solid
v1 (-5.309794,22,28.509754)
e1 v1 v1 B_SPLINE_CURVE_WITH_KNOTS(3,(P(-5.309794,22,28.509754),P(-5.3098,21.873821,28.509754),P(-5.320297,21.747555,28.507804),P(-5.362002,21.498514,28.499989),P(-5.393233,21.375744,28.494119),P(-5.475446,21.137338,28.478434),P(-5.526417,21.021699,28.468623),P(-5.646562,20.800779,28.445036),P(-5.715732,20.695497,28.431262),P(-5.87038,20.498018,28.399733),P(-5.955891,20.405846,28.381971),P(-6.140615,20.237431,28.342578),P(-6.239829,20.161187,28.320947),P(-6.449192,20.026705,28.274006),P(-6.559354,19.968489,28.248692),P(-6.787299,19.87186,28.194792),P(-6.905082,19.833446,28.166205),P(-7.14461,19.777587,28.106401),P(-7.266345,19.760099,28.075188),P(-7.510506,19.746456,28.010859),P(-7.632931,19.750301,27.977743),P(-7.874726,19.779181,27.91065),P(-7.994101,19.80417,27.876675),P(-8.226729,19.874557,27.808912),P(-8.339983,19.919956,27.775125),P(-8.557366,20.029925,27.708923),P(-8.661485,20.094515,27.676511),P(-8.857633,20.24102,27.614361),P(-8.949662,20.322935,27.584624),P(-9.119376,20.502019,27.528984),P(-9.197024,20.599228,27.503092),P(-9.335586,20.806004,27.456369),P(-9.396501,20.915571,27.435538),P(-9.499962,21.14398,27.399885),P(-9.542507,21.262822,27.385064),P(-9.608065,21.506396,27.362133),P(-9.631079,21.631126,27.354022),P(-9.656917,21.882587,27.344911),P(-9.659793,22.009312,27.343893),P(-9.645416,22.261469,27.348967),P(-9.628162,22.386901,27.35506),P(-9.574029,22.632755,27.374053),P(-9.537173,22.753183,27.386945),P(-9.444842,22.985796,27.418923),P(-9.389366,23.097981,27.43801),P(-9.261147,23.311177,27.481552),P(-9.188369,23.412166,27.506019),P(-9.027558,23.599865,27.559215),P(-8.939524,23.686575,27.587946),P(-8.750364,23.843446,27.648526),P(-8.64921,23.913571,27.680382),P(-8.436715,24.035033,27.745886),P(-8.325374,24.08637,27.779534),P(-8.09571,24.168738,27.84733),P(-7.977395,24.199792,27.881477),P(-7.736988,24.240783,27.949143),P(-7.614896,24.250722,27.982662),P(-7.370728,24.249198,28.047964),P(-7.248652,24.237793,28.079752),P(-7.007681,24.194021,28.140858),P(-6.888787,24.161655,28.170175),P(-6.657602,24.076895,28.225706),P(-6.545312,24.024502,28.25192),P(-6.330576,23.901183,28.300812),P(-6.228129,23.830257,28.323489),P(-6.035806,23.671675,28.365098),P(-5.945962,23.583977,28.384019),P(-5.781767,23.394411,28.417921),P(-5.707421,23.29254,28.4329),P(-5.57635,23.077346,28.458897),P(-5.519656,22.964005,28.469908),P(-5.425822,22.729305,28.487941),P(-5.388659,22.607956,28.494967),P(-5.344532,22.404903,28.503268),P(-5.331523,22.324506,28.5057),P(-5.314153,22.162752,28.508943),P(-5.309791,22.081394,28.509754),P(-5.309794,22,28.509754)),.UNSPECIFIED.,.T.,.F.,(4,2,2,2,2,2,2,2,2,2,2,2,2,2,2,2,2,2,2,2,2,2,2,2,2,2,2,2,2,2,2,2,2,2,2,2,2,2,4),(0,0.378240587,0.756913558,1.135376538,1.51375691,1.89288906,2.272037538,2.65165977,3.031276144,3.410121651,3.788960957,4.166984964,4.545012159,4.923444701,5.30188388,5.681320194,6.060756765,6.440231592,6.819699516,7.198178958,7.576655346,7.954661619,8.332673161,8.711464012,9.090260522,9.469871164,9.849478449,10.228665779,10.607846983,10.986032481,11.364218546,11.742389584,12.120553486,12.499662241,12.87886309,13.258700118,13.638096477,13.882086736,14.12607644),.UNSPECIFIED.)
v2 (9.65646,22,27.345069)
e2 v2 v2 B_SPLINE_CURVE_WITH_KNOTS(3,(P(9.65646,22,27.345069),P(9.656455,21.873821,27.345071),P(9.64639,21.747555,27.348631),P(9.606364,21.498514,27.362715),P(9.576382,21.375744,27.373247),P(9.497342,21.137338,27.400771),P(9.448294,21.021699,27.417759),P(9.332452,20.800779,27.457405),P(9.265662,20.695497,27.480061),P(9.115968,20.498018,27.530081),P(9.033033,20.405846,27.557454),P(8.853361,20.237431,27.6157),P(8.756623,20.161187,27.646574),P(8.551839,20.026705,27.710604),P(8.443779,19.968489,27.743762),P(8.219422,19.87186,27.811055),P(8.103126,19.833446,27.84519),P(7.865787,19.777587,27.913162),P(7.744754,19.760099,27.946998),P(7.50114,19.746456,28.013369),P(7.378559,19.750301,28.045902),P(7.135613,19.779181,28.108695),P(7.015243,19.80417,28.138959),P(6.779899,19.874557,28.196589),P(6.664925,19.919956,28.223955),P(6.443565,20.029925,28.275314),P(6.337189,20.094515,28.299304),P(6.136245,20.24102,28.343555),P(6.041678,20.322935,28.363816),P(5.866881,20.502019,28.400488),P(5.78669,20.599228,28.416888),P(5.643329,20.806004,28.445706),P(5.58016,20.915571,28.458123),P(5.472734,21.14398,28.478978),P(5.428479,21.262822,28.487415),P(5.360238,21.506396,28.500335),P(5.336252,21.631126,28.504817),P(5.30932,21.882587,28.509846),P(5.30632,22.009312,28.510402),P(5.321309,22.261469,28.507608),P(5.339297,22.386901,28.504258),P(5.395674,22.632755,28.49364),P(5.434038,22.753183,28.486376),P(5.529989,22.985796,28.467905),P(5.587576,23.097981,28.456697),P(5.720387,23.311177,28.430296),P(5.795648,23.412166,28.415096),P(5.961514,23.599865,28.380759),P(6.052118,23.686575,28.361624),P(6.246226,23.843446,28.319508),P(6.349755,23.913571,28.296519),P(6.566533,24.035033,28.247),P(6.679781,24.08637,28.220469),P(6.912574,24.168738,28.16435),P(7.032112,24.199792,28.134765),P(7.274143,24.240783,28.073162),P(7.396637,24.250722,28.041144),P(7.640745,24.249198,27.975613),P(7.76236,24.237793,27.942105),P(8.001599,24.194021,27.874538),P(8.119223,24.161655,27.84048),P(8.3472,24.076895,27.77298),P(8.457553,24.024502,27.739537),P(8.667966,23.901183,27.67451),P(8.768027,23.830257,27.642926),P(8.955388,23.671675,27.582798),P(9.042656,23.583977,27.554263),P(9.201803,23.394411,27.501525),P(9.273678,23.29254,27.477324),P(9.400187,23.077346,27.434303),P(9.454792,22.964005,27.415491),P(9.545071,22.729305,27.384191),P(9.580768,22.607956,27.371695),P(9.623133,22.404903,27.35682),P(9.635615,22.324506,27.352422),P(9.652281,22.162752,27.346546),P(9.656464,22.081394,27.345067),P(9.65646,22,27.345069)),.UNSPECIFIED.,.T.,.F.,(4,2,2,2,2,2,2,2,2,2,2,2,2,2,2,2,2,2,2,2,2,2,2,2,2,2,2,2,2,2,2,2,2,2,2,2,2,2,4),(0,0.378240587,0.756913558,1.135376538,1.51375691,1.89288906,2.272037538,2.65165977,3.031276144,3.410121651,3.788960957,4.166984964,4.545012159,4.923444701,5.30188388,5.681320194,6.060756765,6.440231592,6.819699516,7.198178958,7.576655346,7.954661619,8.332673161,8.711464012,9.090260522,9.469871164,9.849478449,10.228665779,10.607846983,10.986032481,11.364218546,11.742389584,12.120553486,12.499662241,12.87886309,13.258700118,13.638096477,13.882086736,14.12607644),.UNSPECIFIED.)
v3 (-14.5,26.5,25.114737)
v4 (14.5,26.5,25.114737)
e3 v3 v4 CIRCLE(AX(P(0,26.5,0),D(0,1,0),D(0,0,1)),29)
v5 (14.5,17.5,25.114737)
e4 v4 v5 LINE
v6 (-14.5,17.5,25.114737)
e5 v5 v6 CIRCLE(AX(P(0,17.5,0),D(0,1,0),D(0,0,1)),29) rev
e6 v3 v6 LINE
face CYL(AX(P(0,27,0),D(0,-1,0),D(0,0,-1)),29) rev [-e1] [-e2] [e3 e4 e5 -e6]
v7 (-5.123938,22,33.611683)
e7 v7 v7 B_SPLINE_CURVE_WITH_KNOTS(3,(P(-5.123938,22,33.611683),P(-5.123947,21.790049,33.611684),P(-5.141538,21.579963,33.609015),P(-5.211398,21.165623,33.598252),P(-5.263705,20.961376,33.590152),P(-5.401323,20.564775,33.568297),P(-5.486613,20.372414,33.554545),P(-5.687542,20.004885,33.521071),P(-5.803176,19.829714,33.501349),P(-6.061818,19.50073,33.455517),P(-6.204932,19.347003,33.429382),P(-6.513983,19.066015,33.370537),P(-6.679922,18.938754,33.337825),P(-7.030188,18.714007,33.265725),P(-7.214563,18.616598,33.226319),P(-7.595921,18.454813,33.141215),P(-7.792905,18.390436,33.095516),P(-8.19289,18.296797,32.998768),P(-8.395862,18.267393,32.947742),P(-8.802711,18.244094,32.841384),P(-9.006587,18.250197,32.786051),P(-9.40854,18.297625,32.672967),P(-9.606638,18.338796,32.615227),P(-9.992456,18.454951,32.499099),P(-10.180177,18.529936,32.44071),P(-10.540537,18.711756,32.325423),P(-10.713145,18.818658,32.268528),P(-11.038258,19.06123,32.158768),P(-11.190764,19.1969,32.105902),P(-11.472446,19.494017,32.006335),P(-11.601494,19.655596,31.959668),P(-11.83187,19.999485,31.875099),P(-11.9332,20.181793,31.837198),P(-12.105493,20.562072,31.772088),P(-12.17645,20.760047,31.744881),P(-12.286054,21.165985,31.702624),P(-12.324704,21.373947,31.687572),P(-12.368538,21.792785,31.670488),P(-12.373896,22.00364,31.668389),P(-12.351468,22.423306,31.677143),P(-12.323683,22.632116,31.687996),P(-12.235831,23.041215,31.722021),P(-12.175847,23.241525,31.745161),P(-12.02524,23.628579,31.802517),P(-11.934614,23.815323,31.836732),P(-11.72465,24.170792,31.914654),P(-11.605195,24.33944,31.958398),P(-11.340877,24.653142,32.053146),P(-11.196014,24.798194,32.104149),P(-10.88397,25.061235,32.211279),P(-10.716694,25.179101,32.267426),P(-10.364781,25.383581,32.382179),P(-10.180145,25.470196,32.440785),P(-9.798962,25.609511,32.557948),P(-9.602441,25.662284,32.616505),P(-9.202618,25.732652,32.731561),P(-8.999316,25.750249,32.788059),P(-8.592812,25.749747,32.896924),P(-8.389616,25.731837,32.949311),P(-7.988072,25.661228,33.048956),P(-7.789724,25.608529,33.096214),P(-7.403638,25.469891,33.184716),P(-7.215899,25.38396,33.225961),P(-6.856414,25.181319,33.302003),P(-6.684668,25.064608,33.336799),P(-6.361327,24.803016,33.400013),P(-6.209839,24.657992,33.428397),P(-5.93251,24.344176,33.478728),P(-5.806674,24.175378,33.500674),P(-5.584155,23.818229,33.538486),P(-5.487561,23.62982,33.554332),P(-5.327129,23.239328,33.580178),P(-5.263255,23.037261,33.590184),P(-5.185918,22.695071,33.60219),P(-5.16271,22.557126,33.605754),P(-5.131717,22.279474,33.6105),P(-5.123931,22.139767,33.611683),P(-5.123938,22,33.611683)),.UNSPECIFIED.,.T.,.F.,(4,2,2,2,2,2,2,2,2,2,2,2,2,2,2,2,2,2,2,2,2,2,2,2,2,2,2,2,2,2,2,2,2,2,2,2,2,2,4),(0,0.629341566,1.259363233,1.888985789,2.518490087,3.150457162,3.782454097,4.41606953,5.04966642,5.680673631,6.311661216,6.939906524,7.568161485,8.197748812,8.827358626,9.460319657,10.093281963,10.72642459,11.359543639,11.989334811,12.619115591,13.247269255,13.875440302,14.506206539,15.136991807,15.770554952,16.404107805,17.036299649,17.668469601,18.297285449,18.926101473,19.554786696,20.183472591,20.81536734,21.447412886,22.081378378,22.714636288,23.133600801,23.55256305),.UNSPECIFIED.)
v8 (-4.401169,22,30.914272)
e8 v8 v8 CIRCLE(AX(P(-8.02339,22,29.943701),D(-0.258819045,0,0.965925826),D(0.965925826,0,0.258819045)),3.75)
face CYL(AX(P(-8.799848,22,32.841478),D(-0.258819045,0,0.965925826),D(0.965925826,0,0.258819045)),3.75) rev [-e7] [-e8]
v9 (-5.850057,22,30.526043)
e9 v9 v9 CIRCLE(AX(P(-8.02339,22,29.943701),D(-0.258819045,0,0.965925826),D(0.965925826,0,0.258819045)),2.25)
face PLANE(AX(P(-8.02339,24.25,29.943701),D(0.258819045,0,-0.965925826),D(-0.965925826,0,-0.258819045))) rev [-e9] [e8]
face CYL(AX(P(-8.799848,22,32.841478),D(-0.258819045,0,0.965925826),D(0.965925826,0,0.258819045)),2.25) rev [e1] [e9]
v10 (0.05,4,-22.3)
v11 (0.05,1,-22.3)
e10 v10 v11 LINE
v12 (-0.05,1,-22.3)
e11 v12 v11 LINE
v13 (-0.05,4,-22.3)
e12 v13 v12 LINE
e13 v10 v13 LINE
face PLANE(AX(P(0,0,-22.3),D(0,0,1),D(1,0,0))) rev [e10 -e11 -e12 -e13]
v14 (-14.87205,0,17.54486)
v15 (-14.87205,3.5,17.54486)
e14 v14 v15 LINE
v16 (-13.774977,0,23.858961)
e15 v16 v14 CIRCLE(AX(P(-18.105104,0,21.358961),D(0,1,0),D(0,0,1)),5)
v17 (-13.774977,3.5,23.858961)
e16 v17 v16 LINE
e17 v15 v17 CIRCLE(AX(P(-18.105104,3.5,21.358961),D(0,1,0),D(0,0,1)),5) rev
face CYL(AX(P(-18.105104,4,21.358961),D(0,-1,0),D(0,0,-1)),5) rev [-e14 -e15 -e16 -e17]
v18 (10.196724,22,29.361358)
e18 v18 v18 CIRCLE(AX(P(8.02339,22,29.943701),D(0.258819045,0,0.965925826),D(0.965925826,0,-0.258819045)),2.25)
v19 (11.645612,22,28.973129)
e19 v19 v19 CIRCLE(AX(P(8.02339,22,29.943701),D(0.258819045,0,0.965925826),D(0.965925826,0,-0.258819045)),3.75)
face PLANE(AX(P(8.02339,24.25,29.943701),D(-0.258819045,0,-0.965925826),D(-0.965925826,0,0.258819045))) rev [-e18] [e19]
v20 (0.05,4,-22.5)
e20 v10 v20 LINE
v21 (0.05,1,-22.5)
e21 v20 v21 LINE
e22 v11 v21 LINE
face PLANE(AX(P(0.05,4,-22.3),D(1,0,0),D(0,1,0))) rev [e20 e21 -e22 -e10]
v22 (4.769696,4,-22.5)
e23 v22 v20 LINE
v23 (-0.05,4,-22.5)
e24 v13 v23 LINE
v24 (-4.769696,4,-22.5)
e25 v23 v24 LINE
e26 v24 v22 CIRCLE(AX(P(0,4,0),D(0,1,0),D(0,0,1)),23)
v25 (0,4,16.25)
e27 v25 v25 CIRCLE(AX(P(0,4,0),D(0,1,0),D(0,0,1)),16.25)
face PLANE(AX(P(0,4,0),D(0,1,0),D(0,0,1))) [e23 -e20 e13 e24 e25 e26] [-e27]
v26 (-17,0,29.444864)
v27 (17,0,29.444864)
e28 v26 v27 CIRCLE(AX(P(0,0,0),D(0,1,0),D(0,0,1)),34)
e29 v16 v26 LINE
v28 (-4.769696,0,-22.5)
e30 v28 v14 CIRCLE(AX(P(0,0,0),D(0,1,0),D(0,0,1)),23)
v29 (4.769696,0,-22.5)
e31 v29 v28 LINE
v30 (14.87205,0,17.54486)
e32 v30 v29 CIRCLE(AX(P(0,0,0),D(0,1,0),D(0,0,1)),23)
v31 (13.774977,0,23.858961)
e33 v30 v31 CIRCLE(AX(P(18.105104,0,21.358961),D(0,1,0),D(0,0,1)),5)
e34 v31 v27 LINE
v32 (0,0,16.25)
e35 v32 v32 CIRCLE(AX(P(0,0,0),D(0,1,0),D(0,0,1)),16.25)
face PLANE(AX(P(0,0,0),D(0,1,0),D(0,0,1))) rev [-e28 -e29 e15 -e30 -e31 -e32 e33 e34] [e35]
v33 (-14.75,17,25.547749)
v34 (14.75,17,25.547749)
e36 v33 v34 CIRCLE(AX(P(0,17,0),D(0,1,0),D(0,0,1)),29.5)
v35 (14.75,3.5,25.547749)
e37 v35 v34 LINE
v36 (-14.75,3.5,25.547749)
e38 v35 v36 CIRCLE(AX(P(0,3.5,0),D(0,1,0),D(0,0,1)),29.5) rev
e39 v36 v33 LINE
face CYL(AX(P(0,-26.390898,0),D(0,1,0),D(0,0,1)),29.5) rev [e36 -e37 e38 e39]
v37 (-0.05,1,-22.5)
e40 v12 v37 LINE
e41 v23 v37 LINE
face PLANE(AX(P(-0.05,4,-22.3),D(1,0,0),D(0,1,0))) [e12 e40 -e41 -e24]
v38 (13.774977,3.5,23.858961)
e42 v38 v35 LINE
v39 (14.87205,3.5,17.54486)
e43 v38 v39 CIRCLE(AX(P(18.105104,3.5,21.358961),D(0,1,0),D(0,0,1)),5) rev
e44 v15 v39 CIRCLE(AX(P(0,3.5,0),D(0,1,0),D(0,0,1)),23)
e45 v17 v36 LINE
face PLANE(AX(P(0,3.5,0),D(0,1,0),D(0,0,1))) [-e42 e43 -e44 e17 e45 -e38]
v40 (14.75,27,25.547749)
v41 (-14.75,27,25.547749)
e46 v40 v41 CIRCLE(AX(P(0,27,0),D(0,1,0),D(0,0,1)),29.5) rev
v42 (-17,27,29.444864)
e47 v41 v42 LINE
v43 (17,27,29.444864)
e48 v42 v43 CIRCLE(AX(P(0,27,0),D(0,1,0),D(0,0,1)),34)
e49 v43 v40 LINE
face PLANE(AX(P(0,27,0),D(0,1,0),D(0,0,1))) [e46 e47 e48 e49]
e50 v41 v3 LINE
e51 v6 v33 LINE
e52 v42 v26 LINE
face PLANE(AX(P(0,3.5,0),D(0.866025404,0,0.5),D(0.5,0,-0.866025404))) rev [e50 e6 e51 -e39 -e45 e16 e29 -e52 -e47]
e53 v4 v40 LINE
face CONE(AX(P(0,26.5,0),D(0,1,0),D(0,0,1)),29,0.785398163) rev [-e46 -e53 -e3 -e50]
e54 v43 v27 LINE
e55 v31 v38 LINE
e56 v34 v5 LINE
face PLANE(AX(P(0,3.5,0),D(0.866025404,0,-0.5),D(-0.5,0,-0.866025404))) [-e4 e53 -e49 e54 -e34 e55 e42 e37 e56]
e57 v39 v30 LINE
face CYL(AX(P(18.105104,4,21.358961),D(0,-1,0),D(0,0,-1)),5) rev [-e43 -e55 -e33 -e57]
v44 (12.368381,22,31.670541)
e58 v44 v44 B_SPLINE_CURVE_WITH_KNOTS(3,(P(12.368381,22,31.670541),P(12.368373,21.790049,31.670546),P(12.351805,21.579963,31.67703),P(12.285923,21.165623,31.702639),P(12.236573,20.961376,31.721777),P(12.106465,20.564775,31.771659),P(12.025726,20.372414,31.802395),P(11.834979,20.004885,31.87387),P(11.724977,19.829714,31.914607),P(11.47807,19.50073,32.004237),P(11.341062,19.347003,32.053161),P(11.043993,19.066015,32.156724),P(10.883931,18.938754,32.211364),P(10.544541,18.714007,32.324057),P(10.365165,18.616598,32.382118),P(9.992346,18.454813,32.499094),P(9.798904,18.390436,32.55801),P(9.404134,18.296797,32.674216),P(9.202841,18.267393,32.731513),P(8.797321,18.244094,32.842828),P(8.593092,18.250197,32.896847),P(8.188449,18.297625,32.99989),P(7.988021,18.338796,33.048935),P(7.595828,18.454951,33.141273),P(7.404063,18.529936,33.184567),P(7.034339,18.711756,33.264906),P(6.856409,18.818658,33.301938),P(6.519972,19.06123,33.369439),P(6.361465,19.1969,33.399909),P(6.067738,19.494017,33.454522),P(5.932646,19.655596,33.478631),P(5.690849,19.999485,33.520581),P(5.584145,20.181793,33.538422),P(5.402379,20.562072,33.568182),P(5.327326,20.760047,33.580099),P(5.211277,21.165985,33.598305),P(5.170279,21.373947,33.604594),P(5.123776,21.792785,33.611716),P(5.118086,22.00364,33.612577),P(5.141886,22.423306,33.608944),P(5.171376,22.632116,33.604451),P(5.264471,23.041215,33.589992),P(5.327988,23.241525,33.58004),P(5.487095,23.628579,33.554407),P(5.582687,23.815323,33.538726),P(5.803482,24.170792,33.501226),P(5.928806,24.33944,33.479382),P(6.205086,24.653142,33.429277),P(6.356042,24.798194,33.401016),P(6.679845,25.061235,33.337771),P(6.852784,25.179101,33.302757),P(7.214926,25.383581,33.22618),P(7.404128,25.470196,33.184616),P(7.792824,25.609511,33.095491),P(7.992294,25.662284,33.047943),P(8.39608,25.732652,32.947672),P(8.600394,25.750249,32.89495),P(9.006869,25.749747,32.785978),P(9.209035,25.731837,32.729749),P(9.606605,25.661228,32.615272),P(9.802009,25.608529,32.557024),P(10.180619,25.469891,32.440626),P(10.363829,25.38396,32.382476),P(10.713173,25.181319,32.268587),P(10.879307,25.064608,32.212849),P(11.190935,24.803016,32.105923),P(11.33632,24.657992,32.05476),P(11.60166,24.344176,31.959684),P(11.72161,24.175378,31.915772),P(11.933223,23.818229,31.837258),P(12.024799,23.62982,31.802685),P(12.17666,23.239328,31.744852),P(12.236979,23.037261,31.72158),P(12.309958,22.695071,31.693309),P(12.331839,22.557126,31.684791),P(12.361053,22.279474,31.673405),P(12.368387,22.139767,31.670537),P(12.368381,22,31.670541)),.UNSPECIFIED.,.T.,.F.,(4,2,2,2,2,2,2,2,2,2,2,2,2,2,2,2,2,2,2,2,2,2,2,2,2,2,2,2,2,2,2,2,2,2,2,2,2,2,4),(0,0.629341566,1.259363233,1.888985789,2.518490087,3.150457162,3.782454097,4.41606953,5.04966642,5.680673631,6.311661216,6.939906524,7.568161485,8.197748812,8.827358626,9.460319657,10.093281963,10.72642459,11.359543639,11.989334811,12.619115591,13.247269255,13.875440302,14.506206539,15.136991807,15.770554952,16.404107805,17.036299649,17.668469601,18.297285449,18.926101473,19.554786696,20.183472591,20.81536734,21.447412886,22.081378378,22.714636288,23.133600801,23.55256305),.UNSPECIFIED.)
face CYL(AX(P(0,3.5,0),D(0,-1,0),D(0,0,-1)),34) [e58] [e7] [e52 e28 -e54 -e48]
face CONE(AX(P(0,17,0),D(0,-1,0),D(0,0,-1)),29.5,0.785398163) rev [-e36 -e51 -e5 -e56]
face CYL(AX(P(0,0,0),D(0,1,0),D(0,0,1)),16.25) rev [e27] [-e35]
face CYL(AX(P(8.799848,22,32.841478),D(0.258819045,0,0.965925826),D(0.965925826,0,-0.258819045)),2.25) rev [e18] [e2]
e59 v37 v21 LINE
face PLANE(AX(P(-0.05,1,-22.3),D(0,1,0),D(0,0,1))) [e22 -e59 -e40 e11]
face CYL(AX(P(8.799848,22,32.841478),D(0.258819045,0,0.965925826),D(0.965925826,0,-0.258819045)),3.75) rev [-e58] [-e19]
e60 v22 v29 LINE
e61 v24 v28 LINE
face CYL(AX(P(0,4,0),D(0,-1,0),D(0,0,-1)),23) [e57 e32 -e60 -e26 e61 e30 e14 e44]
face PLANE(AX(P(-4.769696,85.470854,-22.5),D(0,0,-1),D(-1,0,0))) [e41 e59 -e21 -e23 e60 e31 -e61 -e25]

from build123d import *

# Parameters (mm, degrees)
SKETCH_1_R                          = 23
EXTRUDE_1_DEPTH                     = 4
CUT_EXTRUDE_1_DEPTH                 = 33.771939216
CUT_EXTRUDE_1_DEPTH_BACK            = 33.771939216
SKETCH_4_R                          = 16.25
CUT_EXTRUDE_2_DEPTH                 = 33.771939216
EXTRUDE_2_DEPTH                     = 3.5
FILLET_1_R                          = 5
EXTRUDE_START                       = -3.5
EXTRUDE_3_DEPTH                     = 27
CUT_EXTRUDE_START                   = -10
CUT_EXTRUDE_1_2_DEPTH               = 13.5
CHAMFER_1_SIZE                      = 0.5
HOLE_WIZARD_2_D                     = 4.5
HOLE_WIZARD_2_DEPTH                 = 7.5
HOLE_WIZARD_2_CBORE_D               = 7.5
HOLE_WIZARD_2_CBORE_DEPTH           = 3
HOLE_WIZARD_2_ON_FACE_2_D           = 4.5
HOLE_WIZARD_2_ON_FACE_2_DEPTH       = 7.5
HOLE_WIZARD_2_ON_FACE_2_CBORE_D     = 7.5
HOLE_WIZARD_2_ON_FACE_2_CBORE_DEPTH = 3
SKETCH_12_W                         = 0.1
SKETCH_12_H                         = 3
CUT_EXTRUDE_2_2_DEPTH               = 0.2


with BuildPart() as part:
    # 草图1 → 凸台-拉伸1 (new body)
    with BuildSketch(Plane(origin=(0, 0, 0), x_dir=(1, 0, 0), z_dir=(0, 1, 0))):
        with Locations(Location((0, 0, 0), (0, 0, 270))):
            Circle(SKETCH_1_R)
    extrude(amount=EXTRUDE_1_DEPTH)

    # 草图3 → Cut-Extrude 1 (cut, two sides: drawn at the far end of the back side and taken through both)
    with BuildSketch(Plane(origin=(0, 4, 0), x_dir=(1, 0, 0), z_dir=(0, 1, 0)).offset(-CUT_EXTRUDE_1_DEPTH_BACK)):
        Polygon((-121.379376924, 22.5), (-4.769696007, 22.5), (4.769696007, 22.5), (121.379376924, 22.5), (121.379376924, 255.719361835), (-121.379376924, 255.719361835), align=None)
    extrude(amount=CUT_EXTRUDE_1_DEPTH + CUT_EXTRUDE_1_DEPTH_BACK, mode=Mode.SUBTRACT)

    # 草图4 → Cut-Extrude 2 (cut, through all)
    with BuildSketch(Plane(origin=(0, 4, 0), x_dir=(1, 0, 0), z_dir=(0, 1, 0))):
        with Locations(Location((0, 0, 0), (0, 0, 270))):
            Circle(SKETCH_4_R)
    extrude(amount=-CUT_EXTRUDE_2_DEPTH, mode=Mode.SUBTRACT)

    # 草图5 → 凸台-拉伸2 (add)
    with BuildSketch(Plane(origin=(0, 0, 0), x_dir=(1, 0, 0), z_dir=(0, 1, 0))):
        with BuildLine():
            ThreePointArc((11.5, -19.918584287), (0, -23), (-11.5, -19.918584287))
            Line((-11.5, -19.918584287), (-17, -29.444863729))
            ThreePointArc((-17, -29.444863729), (0, -34), (17, -29.444863729))
            Line((17, -29.444863729), (11.5, -19.918584287))
        make_face()
    extrude(amount=EXTRUDE_2_DEPTH)

    # 圆角1
    fillet_1_edges = [part.edges().sort_by_distance(p)[0] for p in [
        (11.5, 1.75, 19.918584287),
        (-11.5, 1.75, 19.918584287),
    ]]
    fillet(fillet_1_edges, radius=FILLET_1_R)

    # 草图7 → 凸台-拉伸3 (add)
    with BuildSketch(Plane(origin=(0, 3.5, 0), x_dir=(1, 0, 0), z_dir=(0, 1, 0)).offset(EXTRUDE_START)):
        with BuildLine():
            Line((-14.5, -25.11473671), (-17, -29.444863729))
            ThreePointArc((-17, -29.444863729), (0, -34), (17, -29.444863729))
            Line((17, -29.444863729), (14.5, -25.11473671))
            ThreePointArc((14.5, -25.11473671), (0, -29), (-14.5, -25.11473671))
        make_face()
    extrude(amount=EXTRUDE_3_DEPTH)

    # 草图8 → Cut-Extrude 1 2 (cut)
    with BuildSketch(Plane(origin=(0, 27, 0), x_dir=(1, 0, 0), z_dir=(0, 1, 0)).offset(CUT_EXTRUDE_START)):
        with BuildLine():
            ThreePointArc((-14.75, -25.547749412), (0, -29.5), (14.75, -25.547749412))
            Line((14.75, -25.547749412), (14.25, -24.681724008))
            ThreePointArc((14.25, -24.681724008), (0, -28.5), (-14.25, -24.681724008))
            Line((-14.25, -24.681724008), (-14.75, -25.547749412))
        make_face()
    extrude(amount=-CUT_EXTRUDE_1_2_DEPTH, mode=Mode.SUBTRACT)

    # 倒角1
    chamfer_1_edges = [part.edges().sort_by_distance(p)[0] for p in [
        (0, 17, 29),
        (0, 27, 29),
    ]]
    chamfer(chamfer_1_edges, length=CHAMFER_1_SIZE - 0.0001)  # a hair under: the kernel refuses the full size

    # 孔2
    with Locations(Plane(origin=(8.799847533, 22, 32.841478094), x_dir=(0.965925826289, 0, -0.258819045103), z_dir=(0.258819045103, 0, 0.965925826289))):
        with Locations((1e-09, 0)):
            CounterBoreHole(HOLE_WIZARD_2_D / 2, HOLE_WIZARD_2_CBORE_D / 2, HOLE_WIZARD_2_CBORE_DEPTH, depth=HOLE_WIZARD_2_DEPTH)

    # 孔2 on face 2
    with Locations(Plane(origin=(-8.799847533, 22, 32.841478094), x_dir=(0.965925849201, 0, 0.258818959594), z_dir=(-0.258818959594, 0, 0.965925849201))):
        with Locations((-1e-09, 0)):
            CounterBoreHole(HOLE_WIZARD_2_ON_FACE_2_D / 2, HOLE_WIZARD_2_ON_FACE_2_CBORE_D / 2, HOLE_WIZARD_2_ON_FACE_2_CBORE_DEPTH, depth=HOLE_WIZARD_2_ON_FACE_2_DEPTH)

    # 草图12 → Cut-Extrude 2 2 (cut)
    with BuildSketch(Plane(origin=(0, 0, -22.5), x_dir=(-1, 0, 0), z_dir=(0, 0, -1))):
        with Locations((0, 2.5)):
            Rectangle(SKETCH_12_W, SKETCH_12_H)
    extrude(amount=-CUT_EXTRUDE_2_2_DEPTH, mode=Mode.SUBTRACT)


solid = part.part
